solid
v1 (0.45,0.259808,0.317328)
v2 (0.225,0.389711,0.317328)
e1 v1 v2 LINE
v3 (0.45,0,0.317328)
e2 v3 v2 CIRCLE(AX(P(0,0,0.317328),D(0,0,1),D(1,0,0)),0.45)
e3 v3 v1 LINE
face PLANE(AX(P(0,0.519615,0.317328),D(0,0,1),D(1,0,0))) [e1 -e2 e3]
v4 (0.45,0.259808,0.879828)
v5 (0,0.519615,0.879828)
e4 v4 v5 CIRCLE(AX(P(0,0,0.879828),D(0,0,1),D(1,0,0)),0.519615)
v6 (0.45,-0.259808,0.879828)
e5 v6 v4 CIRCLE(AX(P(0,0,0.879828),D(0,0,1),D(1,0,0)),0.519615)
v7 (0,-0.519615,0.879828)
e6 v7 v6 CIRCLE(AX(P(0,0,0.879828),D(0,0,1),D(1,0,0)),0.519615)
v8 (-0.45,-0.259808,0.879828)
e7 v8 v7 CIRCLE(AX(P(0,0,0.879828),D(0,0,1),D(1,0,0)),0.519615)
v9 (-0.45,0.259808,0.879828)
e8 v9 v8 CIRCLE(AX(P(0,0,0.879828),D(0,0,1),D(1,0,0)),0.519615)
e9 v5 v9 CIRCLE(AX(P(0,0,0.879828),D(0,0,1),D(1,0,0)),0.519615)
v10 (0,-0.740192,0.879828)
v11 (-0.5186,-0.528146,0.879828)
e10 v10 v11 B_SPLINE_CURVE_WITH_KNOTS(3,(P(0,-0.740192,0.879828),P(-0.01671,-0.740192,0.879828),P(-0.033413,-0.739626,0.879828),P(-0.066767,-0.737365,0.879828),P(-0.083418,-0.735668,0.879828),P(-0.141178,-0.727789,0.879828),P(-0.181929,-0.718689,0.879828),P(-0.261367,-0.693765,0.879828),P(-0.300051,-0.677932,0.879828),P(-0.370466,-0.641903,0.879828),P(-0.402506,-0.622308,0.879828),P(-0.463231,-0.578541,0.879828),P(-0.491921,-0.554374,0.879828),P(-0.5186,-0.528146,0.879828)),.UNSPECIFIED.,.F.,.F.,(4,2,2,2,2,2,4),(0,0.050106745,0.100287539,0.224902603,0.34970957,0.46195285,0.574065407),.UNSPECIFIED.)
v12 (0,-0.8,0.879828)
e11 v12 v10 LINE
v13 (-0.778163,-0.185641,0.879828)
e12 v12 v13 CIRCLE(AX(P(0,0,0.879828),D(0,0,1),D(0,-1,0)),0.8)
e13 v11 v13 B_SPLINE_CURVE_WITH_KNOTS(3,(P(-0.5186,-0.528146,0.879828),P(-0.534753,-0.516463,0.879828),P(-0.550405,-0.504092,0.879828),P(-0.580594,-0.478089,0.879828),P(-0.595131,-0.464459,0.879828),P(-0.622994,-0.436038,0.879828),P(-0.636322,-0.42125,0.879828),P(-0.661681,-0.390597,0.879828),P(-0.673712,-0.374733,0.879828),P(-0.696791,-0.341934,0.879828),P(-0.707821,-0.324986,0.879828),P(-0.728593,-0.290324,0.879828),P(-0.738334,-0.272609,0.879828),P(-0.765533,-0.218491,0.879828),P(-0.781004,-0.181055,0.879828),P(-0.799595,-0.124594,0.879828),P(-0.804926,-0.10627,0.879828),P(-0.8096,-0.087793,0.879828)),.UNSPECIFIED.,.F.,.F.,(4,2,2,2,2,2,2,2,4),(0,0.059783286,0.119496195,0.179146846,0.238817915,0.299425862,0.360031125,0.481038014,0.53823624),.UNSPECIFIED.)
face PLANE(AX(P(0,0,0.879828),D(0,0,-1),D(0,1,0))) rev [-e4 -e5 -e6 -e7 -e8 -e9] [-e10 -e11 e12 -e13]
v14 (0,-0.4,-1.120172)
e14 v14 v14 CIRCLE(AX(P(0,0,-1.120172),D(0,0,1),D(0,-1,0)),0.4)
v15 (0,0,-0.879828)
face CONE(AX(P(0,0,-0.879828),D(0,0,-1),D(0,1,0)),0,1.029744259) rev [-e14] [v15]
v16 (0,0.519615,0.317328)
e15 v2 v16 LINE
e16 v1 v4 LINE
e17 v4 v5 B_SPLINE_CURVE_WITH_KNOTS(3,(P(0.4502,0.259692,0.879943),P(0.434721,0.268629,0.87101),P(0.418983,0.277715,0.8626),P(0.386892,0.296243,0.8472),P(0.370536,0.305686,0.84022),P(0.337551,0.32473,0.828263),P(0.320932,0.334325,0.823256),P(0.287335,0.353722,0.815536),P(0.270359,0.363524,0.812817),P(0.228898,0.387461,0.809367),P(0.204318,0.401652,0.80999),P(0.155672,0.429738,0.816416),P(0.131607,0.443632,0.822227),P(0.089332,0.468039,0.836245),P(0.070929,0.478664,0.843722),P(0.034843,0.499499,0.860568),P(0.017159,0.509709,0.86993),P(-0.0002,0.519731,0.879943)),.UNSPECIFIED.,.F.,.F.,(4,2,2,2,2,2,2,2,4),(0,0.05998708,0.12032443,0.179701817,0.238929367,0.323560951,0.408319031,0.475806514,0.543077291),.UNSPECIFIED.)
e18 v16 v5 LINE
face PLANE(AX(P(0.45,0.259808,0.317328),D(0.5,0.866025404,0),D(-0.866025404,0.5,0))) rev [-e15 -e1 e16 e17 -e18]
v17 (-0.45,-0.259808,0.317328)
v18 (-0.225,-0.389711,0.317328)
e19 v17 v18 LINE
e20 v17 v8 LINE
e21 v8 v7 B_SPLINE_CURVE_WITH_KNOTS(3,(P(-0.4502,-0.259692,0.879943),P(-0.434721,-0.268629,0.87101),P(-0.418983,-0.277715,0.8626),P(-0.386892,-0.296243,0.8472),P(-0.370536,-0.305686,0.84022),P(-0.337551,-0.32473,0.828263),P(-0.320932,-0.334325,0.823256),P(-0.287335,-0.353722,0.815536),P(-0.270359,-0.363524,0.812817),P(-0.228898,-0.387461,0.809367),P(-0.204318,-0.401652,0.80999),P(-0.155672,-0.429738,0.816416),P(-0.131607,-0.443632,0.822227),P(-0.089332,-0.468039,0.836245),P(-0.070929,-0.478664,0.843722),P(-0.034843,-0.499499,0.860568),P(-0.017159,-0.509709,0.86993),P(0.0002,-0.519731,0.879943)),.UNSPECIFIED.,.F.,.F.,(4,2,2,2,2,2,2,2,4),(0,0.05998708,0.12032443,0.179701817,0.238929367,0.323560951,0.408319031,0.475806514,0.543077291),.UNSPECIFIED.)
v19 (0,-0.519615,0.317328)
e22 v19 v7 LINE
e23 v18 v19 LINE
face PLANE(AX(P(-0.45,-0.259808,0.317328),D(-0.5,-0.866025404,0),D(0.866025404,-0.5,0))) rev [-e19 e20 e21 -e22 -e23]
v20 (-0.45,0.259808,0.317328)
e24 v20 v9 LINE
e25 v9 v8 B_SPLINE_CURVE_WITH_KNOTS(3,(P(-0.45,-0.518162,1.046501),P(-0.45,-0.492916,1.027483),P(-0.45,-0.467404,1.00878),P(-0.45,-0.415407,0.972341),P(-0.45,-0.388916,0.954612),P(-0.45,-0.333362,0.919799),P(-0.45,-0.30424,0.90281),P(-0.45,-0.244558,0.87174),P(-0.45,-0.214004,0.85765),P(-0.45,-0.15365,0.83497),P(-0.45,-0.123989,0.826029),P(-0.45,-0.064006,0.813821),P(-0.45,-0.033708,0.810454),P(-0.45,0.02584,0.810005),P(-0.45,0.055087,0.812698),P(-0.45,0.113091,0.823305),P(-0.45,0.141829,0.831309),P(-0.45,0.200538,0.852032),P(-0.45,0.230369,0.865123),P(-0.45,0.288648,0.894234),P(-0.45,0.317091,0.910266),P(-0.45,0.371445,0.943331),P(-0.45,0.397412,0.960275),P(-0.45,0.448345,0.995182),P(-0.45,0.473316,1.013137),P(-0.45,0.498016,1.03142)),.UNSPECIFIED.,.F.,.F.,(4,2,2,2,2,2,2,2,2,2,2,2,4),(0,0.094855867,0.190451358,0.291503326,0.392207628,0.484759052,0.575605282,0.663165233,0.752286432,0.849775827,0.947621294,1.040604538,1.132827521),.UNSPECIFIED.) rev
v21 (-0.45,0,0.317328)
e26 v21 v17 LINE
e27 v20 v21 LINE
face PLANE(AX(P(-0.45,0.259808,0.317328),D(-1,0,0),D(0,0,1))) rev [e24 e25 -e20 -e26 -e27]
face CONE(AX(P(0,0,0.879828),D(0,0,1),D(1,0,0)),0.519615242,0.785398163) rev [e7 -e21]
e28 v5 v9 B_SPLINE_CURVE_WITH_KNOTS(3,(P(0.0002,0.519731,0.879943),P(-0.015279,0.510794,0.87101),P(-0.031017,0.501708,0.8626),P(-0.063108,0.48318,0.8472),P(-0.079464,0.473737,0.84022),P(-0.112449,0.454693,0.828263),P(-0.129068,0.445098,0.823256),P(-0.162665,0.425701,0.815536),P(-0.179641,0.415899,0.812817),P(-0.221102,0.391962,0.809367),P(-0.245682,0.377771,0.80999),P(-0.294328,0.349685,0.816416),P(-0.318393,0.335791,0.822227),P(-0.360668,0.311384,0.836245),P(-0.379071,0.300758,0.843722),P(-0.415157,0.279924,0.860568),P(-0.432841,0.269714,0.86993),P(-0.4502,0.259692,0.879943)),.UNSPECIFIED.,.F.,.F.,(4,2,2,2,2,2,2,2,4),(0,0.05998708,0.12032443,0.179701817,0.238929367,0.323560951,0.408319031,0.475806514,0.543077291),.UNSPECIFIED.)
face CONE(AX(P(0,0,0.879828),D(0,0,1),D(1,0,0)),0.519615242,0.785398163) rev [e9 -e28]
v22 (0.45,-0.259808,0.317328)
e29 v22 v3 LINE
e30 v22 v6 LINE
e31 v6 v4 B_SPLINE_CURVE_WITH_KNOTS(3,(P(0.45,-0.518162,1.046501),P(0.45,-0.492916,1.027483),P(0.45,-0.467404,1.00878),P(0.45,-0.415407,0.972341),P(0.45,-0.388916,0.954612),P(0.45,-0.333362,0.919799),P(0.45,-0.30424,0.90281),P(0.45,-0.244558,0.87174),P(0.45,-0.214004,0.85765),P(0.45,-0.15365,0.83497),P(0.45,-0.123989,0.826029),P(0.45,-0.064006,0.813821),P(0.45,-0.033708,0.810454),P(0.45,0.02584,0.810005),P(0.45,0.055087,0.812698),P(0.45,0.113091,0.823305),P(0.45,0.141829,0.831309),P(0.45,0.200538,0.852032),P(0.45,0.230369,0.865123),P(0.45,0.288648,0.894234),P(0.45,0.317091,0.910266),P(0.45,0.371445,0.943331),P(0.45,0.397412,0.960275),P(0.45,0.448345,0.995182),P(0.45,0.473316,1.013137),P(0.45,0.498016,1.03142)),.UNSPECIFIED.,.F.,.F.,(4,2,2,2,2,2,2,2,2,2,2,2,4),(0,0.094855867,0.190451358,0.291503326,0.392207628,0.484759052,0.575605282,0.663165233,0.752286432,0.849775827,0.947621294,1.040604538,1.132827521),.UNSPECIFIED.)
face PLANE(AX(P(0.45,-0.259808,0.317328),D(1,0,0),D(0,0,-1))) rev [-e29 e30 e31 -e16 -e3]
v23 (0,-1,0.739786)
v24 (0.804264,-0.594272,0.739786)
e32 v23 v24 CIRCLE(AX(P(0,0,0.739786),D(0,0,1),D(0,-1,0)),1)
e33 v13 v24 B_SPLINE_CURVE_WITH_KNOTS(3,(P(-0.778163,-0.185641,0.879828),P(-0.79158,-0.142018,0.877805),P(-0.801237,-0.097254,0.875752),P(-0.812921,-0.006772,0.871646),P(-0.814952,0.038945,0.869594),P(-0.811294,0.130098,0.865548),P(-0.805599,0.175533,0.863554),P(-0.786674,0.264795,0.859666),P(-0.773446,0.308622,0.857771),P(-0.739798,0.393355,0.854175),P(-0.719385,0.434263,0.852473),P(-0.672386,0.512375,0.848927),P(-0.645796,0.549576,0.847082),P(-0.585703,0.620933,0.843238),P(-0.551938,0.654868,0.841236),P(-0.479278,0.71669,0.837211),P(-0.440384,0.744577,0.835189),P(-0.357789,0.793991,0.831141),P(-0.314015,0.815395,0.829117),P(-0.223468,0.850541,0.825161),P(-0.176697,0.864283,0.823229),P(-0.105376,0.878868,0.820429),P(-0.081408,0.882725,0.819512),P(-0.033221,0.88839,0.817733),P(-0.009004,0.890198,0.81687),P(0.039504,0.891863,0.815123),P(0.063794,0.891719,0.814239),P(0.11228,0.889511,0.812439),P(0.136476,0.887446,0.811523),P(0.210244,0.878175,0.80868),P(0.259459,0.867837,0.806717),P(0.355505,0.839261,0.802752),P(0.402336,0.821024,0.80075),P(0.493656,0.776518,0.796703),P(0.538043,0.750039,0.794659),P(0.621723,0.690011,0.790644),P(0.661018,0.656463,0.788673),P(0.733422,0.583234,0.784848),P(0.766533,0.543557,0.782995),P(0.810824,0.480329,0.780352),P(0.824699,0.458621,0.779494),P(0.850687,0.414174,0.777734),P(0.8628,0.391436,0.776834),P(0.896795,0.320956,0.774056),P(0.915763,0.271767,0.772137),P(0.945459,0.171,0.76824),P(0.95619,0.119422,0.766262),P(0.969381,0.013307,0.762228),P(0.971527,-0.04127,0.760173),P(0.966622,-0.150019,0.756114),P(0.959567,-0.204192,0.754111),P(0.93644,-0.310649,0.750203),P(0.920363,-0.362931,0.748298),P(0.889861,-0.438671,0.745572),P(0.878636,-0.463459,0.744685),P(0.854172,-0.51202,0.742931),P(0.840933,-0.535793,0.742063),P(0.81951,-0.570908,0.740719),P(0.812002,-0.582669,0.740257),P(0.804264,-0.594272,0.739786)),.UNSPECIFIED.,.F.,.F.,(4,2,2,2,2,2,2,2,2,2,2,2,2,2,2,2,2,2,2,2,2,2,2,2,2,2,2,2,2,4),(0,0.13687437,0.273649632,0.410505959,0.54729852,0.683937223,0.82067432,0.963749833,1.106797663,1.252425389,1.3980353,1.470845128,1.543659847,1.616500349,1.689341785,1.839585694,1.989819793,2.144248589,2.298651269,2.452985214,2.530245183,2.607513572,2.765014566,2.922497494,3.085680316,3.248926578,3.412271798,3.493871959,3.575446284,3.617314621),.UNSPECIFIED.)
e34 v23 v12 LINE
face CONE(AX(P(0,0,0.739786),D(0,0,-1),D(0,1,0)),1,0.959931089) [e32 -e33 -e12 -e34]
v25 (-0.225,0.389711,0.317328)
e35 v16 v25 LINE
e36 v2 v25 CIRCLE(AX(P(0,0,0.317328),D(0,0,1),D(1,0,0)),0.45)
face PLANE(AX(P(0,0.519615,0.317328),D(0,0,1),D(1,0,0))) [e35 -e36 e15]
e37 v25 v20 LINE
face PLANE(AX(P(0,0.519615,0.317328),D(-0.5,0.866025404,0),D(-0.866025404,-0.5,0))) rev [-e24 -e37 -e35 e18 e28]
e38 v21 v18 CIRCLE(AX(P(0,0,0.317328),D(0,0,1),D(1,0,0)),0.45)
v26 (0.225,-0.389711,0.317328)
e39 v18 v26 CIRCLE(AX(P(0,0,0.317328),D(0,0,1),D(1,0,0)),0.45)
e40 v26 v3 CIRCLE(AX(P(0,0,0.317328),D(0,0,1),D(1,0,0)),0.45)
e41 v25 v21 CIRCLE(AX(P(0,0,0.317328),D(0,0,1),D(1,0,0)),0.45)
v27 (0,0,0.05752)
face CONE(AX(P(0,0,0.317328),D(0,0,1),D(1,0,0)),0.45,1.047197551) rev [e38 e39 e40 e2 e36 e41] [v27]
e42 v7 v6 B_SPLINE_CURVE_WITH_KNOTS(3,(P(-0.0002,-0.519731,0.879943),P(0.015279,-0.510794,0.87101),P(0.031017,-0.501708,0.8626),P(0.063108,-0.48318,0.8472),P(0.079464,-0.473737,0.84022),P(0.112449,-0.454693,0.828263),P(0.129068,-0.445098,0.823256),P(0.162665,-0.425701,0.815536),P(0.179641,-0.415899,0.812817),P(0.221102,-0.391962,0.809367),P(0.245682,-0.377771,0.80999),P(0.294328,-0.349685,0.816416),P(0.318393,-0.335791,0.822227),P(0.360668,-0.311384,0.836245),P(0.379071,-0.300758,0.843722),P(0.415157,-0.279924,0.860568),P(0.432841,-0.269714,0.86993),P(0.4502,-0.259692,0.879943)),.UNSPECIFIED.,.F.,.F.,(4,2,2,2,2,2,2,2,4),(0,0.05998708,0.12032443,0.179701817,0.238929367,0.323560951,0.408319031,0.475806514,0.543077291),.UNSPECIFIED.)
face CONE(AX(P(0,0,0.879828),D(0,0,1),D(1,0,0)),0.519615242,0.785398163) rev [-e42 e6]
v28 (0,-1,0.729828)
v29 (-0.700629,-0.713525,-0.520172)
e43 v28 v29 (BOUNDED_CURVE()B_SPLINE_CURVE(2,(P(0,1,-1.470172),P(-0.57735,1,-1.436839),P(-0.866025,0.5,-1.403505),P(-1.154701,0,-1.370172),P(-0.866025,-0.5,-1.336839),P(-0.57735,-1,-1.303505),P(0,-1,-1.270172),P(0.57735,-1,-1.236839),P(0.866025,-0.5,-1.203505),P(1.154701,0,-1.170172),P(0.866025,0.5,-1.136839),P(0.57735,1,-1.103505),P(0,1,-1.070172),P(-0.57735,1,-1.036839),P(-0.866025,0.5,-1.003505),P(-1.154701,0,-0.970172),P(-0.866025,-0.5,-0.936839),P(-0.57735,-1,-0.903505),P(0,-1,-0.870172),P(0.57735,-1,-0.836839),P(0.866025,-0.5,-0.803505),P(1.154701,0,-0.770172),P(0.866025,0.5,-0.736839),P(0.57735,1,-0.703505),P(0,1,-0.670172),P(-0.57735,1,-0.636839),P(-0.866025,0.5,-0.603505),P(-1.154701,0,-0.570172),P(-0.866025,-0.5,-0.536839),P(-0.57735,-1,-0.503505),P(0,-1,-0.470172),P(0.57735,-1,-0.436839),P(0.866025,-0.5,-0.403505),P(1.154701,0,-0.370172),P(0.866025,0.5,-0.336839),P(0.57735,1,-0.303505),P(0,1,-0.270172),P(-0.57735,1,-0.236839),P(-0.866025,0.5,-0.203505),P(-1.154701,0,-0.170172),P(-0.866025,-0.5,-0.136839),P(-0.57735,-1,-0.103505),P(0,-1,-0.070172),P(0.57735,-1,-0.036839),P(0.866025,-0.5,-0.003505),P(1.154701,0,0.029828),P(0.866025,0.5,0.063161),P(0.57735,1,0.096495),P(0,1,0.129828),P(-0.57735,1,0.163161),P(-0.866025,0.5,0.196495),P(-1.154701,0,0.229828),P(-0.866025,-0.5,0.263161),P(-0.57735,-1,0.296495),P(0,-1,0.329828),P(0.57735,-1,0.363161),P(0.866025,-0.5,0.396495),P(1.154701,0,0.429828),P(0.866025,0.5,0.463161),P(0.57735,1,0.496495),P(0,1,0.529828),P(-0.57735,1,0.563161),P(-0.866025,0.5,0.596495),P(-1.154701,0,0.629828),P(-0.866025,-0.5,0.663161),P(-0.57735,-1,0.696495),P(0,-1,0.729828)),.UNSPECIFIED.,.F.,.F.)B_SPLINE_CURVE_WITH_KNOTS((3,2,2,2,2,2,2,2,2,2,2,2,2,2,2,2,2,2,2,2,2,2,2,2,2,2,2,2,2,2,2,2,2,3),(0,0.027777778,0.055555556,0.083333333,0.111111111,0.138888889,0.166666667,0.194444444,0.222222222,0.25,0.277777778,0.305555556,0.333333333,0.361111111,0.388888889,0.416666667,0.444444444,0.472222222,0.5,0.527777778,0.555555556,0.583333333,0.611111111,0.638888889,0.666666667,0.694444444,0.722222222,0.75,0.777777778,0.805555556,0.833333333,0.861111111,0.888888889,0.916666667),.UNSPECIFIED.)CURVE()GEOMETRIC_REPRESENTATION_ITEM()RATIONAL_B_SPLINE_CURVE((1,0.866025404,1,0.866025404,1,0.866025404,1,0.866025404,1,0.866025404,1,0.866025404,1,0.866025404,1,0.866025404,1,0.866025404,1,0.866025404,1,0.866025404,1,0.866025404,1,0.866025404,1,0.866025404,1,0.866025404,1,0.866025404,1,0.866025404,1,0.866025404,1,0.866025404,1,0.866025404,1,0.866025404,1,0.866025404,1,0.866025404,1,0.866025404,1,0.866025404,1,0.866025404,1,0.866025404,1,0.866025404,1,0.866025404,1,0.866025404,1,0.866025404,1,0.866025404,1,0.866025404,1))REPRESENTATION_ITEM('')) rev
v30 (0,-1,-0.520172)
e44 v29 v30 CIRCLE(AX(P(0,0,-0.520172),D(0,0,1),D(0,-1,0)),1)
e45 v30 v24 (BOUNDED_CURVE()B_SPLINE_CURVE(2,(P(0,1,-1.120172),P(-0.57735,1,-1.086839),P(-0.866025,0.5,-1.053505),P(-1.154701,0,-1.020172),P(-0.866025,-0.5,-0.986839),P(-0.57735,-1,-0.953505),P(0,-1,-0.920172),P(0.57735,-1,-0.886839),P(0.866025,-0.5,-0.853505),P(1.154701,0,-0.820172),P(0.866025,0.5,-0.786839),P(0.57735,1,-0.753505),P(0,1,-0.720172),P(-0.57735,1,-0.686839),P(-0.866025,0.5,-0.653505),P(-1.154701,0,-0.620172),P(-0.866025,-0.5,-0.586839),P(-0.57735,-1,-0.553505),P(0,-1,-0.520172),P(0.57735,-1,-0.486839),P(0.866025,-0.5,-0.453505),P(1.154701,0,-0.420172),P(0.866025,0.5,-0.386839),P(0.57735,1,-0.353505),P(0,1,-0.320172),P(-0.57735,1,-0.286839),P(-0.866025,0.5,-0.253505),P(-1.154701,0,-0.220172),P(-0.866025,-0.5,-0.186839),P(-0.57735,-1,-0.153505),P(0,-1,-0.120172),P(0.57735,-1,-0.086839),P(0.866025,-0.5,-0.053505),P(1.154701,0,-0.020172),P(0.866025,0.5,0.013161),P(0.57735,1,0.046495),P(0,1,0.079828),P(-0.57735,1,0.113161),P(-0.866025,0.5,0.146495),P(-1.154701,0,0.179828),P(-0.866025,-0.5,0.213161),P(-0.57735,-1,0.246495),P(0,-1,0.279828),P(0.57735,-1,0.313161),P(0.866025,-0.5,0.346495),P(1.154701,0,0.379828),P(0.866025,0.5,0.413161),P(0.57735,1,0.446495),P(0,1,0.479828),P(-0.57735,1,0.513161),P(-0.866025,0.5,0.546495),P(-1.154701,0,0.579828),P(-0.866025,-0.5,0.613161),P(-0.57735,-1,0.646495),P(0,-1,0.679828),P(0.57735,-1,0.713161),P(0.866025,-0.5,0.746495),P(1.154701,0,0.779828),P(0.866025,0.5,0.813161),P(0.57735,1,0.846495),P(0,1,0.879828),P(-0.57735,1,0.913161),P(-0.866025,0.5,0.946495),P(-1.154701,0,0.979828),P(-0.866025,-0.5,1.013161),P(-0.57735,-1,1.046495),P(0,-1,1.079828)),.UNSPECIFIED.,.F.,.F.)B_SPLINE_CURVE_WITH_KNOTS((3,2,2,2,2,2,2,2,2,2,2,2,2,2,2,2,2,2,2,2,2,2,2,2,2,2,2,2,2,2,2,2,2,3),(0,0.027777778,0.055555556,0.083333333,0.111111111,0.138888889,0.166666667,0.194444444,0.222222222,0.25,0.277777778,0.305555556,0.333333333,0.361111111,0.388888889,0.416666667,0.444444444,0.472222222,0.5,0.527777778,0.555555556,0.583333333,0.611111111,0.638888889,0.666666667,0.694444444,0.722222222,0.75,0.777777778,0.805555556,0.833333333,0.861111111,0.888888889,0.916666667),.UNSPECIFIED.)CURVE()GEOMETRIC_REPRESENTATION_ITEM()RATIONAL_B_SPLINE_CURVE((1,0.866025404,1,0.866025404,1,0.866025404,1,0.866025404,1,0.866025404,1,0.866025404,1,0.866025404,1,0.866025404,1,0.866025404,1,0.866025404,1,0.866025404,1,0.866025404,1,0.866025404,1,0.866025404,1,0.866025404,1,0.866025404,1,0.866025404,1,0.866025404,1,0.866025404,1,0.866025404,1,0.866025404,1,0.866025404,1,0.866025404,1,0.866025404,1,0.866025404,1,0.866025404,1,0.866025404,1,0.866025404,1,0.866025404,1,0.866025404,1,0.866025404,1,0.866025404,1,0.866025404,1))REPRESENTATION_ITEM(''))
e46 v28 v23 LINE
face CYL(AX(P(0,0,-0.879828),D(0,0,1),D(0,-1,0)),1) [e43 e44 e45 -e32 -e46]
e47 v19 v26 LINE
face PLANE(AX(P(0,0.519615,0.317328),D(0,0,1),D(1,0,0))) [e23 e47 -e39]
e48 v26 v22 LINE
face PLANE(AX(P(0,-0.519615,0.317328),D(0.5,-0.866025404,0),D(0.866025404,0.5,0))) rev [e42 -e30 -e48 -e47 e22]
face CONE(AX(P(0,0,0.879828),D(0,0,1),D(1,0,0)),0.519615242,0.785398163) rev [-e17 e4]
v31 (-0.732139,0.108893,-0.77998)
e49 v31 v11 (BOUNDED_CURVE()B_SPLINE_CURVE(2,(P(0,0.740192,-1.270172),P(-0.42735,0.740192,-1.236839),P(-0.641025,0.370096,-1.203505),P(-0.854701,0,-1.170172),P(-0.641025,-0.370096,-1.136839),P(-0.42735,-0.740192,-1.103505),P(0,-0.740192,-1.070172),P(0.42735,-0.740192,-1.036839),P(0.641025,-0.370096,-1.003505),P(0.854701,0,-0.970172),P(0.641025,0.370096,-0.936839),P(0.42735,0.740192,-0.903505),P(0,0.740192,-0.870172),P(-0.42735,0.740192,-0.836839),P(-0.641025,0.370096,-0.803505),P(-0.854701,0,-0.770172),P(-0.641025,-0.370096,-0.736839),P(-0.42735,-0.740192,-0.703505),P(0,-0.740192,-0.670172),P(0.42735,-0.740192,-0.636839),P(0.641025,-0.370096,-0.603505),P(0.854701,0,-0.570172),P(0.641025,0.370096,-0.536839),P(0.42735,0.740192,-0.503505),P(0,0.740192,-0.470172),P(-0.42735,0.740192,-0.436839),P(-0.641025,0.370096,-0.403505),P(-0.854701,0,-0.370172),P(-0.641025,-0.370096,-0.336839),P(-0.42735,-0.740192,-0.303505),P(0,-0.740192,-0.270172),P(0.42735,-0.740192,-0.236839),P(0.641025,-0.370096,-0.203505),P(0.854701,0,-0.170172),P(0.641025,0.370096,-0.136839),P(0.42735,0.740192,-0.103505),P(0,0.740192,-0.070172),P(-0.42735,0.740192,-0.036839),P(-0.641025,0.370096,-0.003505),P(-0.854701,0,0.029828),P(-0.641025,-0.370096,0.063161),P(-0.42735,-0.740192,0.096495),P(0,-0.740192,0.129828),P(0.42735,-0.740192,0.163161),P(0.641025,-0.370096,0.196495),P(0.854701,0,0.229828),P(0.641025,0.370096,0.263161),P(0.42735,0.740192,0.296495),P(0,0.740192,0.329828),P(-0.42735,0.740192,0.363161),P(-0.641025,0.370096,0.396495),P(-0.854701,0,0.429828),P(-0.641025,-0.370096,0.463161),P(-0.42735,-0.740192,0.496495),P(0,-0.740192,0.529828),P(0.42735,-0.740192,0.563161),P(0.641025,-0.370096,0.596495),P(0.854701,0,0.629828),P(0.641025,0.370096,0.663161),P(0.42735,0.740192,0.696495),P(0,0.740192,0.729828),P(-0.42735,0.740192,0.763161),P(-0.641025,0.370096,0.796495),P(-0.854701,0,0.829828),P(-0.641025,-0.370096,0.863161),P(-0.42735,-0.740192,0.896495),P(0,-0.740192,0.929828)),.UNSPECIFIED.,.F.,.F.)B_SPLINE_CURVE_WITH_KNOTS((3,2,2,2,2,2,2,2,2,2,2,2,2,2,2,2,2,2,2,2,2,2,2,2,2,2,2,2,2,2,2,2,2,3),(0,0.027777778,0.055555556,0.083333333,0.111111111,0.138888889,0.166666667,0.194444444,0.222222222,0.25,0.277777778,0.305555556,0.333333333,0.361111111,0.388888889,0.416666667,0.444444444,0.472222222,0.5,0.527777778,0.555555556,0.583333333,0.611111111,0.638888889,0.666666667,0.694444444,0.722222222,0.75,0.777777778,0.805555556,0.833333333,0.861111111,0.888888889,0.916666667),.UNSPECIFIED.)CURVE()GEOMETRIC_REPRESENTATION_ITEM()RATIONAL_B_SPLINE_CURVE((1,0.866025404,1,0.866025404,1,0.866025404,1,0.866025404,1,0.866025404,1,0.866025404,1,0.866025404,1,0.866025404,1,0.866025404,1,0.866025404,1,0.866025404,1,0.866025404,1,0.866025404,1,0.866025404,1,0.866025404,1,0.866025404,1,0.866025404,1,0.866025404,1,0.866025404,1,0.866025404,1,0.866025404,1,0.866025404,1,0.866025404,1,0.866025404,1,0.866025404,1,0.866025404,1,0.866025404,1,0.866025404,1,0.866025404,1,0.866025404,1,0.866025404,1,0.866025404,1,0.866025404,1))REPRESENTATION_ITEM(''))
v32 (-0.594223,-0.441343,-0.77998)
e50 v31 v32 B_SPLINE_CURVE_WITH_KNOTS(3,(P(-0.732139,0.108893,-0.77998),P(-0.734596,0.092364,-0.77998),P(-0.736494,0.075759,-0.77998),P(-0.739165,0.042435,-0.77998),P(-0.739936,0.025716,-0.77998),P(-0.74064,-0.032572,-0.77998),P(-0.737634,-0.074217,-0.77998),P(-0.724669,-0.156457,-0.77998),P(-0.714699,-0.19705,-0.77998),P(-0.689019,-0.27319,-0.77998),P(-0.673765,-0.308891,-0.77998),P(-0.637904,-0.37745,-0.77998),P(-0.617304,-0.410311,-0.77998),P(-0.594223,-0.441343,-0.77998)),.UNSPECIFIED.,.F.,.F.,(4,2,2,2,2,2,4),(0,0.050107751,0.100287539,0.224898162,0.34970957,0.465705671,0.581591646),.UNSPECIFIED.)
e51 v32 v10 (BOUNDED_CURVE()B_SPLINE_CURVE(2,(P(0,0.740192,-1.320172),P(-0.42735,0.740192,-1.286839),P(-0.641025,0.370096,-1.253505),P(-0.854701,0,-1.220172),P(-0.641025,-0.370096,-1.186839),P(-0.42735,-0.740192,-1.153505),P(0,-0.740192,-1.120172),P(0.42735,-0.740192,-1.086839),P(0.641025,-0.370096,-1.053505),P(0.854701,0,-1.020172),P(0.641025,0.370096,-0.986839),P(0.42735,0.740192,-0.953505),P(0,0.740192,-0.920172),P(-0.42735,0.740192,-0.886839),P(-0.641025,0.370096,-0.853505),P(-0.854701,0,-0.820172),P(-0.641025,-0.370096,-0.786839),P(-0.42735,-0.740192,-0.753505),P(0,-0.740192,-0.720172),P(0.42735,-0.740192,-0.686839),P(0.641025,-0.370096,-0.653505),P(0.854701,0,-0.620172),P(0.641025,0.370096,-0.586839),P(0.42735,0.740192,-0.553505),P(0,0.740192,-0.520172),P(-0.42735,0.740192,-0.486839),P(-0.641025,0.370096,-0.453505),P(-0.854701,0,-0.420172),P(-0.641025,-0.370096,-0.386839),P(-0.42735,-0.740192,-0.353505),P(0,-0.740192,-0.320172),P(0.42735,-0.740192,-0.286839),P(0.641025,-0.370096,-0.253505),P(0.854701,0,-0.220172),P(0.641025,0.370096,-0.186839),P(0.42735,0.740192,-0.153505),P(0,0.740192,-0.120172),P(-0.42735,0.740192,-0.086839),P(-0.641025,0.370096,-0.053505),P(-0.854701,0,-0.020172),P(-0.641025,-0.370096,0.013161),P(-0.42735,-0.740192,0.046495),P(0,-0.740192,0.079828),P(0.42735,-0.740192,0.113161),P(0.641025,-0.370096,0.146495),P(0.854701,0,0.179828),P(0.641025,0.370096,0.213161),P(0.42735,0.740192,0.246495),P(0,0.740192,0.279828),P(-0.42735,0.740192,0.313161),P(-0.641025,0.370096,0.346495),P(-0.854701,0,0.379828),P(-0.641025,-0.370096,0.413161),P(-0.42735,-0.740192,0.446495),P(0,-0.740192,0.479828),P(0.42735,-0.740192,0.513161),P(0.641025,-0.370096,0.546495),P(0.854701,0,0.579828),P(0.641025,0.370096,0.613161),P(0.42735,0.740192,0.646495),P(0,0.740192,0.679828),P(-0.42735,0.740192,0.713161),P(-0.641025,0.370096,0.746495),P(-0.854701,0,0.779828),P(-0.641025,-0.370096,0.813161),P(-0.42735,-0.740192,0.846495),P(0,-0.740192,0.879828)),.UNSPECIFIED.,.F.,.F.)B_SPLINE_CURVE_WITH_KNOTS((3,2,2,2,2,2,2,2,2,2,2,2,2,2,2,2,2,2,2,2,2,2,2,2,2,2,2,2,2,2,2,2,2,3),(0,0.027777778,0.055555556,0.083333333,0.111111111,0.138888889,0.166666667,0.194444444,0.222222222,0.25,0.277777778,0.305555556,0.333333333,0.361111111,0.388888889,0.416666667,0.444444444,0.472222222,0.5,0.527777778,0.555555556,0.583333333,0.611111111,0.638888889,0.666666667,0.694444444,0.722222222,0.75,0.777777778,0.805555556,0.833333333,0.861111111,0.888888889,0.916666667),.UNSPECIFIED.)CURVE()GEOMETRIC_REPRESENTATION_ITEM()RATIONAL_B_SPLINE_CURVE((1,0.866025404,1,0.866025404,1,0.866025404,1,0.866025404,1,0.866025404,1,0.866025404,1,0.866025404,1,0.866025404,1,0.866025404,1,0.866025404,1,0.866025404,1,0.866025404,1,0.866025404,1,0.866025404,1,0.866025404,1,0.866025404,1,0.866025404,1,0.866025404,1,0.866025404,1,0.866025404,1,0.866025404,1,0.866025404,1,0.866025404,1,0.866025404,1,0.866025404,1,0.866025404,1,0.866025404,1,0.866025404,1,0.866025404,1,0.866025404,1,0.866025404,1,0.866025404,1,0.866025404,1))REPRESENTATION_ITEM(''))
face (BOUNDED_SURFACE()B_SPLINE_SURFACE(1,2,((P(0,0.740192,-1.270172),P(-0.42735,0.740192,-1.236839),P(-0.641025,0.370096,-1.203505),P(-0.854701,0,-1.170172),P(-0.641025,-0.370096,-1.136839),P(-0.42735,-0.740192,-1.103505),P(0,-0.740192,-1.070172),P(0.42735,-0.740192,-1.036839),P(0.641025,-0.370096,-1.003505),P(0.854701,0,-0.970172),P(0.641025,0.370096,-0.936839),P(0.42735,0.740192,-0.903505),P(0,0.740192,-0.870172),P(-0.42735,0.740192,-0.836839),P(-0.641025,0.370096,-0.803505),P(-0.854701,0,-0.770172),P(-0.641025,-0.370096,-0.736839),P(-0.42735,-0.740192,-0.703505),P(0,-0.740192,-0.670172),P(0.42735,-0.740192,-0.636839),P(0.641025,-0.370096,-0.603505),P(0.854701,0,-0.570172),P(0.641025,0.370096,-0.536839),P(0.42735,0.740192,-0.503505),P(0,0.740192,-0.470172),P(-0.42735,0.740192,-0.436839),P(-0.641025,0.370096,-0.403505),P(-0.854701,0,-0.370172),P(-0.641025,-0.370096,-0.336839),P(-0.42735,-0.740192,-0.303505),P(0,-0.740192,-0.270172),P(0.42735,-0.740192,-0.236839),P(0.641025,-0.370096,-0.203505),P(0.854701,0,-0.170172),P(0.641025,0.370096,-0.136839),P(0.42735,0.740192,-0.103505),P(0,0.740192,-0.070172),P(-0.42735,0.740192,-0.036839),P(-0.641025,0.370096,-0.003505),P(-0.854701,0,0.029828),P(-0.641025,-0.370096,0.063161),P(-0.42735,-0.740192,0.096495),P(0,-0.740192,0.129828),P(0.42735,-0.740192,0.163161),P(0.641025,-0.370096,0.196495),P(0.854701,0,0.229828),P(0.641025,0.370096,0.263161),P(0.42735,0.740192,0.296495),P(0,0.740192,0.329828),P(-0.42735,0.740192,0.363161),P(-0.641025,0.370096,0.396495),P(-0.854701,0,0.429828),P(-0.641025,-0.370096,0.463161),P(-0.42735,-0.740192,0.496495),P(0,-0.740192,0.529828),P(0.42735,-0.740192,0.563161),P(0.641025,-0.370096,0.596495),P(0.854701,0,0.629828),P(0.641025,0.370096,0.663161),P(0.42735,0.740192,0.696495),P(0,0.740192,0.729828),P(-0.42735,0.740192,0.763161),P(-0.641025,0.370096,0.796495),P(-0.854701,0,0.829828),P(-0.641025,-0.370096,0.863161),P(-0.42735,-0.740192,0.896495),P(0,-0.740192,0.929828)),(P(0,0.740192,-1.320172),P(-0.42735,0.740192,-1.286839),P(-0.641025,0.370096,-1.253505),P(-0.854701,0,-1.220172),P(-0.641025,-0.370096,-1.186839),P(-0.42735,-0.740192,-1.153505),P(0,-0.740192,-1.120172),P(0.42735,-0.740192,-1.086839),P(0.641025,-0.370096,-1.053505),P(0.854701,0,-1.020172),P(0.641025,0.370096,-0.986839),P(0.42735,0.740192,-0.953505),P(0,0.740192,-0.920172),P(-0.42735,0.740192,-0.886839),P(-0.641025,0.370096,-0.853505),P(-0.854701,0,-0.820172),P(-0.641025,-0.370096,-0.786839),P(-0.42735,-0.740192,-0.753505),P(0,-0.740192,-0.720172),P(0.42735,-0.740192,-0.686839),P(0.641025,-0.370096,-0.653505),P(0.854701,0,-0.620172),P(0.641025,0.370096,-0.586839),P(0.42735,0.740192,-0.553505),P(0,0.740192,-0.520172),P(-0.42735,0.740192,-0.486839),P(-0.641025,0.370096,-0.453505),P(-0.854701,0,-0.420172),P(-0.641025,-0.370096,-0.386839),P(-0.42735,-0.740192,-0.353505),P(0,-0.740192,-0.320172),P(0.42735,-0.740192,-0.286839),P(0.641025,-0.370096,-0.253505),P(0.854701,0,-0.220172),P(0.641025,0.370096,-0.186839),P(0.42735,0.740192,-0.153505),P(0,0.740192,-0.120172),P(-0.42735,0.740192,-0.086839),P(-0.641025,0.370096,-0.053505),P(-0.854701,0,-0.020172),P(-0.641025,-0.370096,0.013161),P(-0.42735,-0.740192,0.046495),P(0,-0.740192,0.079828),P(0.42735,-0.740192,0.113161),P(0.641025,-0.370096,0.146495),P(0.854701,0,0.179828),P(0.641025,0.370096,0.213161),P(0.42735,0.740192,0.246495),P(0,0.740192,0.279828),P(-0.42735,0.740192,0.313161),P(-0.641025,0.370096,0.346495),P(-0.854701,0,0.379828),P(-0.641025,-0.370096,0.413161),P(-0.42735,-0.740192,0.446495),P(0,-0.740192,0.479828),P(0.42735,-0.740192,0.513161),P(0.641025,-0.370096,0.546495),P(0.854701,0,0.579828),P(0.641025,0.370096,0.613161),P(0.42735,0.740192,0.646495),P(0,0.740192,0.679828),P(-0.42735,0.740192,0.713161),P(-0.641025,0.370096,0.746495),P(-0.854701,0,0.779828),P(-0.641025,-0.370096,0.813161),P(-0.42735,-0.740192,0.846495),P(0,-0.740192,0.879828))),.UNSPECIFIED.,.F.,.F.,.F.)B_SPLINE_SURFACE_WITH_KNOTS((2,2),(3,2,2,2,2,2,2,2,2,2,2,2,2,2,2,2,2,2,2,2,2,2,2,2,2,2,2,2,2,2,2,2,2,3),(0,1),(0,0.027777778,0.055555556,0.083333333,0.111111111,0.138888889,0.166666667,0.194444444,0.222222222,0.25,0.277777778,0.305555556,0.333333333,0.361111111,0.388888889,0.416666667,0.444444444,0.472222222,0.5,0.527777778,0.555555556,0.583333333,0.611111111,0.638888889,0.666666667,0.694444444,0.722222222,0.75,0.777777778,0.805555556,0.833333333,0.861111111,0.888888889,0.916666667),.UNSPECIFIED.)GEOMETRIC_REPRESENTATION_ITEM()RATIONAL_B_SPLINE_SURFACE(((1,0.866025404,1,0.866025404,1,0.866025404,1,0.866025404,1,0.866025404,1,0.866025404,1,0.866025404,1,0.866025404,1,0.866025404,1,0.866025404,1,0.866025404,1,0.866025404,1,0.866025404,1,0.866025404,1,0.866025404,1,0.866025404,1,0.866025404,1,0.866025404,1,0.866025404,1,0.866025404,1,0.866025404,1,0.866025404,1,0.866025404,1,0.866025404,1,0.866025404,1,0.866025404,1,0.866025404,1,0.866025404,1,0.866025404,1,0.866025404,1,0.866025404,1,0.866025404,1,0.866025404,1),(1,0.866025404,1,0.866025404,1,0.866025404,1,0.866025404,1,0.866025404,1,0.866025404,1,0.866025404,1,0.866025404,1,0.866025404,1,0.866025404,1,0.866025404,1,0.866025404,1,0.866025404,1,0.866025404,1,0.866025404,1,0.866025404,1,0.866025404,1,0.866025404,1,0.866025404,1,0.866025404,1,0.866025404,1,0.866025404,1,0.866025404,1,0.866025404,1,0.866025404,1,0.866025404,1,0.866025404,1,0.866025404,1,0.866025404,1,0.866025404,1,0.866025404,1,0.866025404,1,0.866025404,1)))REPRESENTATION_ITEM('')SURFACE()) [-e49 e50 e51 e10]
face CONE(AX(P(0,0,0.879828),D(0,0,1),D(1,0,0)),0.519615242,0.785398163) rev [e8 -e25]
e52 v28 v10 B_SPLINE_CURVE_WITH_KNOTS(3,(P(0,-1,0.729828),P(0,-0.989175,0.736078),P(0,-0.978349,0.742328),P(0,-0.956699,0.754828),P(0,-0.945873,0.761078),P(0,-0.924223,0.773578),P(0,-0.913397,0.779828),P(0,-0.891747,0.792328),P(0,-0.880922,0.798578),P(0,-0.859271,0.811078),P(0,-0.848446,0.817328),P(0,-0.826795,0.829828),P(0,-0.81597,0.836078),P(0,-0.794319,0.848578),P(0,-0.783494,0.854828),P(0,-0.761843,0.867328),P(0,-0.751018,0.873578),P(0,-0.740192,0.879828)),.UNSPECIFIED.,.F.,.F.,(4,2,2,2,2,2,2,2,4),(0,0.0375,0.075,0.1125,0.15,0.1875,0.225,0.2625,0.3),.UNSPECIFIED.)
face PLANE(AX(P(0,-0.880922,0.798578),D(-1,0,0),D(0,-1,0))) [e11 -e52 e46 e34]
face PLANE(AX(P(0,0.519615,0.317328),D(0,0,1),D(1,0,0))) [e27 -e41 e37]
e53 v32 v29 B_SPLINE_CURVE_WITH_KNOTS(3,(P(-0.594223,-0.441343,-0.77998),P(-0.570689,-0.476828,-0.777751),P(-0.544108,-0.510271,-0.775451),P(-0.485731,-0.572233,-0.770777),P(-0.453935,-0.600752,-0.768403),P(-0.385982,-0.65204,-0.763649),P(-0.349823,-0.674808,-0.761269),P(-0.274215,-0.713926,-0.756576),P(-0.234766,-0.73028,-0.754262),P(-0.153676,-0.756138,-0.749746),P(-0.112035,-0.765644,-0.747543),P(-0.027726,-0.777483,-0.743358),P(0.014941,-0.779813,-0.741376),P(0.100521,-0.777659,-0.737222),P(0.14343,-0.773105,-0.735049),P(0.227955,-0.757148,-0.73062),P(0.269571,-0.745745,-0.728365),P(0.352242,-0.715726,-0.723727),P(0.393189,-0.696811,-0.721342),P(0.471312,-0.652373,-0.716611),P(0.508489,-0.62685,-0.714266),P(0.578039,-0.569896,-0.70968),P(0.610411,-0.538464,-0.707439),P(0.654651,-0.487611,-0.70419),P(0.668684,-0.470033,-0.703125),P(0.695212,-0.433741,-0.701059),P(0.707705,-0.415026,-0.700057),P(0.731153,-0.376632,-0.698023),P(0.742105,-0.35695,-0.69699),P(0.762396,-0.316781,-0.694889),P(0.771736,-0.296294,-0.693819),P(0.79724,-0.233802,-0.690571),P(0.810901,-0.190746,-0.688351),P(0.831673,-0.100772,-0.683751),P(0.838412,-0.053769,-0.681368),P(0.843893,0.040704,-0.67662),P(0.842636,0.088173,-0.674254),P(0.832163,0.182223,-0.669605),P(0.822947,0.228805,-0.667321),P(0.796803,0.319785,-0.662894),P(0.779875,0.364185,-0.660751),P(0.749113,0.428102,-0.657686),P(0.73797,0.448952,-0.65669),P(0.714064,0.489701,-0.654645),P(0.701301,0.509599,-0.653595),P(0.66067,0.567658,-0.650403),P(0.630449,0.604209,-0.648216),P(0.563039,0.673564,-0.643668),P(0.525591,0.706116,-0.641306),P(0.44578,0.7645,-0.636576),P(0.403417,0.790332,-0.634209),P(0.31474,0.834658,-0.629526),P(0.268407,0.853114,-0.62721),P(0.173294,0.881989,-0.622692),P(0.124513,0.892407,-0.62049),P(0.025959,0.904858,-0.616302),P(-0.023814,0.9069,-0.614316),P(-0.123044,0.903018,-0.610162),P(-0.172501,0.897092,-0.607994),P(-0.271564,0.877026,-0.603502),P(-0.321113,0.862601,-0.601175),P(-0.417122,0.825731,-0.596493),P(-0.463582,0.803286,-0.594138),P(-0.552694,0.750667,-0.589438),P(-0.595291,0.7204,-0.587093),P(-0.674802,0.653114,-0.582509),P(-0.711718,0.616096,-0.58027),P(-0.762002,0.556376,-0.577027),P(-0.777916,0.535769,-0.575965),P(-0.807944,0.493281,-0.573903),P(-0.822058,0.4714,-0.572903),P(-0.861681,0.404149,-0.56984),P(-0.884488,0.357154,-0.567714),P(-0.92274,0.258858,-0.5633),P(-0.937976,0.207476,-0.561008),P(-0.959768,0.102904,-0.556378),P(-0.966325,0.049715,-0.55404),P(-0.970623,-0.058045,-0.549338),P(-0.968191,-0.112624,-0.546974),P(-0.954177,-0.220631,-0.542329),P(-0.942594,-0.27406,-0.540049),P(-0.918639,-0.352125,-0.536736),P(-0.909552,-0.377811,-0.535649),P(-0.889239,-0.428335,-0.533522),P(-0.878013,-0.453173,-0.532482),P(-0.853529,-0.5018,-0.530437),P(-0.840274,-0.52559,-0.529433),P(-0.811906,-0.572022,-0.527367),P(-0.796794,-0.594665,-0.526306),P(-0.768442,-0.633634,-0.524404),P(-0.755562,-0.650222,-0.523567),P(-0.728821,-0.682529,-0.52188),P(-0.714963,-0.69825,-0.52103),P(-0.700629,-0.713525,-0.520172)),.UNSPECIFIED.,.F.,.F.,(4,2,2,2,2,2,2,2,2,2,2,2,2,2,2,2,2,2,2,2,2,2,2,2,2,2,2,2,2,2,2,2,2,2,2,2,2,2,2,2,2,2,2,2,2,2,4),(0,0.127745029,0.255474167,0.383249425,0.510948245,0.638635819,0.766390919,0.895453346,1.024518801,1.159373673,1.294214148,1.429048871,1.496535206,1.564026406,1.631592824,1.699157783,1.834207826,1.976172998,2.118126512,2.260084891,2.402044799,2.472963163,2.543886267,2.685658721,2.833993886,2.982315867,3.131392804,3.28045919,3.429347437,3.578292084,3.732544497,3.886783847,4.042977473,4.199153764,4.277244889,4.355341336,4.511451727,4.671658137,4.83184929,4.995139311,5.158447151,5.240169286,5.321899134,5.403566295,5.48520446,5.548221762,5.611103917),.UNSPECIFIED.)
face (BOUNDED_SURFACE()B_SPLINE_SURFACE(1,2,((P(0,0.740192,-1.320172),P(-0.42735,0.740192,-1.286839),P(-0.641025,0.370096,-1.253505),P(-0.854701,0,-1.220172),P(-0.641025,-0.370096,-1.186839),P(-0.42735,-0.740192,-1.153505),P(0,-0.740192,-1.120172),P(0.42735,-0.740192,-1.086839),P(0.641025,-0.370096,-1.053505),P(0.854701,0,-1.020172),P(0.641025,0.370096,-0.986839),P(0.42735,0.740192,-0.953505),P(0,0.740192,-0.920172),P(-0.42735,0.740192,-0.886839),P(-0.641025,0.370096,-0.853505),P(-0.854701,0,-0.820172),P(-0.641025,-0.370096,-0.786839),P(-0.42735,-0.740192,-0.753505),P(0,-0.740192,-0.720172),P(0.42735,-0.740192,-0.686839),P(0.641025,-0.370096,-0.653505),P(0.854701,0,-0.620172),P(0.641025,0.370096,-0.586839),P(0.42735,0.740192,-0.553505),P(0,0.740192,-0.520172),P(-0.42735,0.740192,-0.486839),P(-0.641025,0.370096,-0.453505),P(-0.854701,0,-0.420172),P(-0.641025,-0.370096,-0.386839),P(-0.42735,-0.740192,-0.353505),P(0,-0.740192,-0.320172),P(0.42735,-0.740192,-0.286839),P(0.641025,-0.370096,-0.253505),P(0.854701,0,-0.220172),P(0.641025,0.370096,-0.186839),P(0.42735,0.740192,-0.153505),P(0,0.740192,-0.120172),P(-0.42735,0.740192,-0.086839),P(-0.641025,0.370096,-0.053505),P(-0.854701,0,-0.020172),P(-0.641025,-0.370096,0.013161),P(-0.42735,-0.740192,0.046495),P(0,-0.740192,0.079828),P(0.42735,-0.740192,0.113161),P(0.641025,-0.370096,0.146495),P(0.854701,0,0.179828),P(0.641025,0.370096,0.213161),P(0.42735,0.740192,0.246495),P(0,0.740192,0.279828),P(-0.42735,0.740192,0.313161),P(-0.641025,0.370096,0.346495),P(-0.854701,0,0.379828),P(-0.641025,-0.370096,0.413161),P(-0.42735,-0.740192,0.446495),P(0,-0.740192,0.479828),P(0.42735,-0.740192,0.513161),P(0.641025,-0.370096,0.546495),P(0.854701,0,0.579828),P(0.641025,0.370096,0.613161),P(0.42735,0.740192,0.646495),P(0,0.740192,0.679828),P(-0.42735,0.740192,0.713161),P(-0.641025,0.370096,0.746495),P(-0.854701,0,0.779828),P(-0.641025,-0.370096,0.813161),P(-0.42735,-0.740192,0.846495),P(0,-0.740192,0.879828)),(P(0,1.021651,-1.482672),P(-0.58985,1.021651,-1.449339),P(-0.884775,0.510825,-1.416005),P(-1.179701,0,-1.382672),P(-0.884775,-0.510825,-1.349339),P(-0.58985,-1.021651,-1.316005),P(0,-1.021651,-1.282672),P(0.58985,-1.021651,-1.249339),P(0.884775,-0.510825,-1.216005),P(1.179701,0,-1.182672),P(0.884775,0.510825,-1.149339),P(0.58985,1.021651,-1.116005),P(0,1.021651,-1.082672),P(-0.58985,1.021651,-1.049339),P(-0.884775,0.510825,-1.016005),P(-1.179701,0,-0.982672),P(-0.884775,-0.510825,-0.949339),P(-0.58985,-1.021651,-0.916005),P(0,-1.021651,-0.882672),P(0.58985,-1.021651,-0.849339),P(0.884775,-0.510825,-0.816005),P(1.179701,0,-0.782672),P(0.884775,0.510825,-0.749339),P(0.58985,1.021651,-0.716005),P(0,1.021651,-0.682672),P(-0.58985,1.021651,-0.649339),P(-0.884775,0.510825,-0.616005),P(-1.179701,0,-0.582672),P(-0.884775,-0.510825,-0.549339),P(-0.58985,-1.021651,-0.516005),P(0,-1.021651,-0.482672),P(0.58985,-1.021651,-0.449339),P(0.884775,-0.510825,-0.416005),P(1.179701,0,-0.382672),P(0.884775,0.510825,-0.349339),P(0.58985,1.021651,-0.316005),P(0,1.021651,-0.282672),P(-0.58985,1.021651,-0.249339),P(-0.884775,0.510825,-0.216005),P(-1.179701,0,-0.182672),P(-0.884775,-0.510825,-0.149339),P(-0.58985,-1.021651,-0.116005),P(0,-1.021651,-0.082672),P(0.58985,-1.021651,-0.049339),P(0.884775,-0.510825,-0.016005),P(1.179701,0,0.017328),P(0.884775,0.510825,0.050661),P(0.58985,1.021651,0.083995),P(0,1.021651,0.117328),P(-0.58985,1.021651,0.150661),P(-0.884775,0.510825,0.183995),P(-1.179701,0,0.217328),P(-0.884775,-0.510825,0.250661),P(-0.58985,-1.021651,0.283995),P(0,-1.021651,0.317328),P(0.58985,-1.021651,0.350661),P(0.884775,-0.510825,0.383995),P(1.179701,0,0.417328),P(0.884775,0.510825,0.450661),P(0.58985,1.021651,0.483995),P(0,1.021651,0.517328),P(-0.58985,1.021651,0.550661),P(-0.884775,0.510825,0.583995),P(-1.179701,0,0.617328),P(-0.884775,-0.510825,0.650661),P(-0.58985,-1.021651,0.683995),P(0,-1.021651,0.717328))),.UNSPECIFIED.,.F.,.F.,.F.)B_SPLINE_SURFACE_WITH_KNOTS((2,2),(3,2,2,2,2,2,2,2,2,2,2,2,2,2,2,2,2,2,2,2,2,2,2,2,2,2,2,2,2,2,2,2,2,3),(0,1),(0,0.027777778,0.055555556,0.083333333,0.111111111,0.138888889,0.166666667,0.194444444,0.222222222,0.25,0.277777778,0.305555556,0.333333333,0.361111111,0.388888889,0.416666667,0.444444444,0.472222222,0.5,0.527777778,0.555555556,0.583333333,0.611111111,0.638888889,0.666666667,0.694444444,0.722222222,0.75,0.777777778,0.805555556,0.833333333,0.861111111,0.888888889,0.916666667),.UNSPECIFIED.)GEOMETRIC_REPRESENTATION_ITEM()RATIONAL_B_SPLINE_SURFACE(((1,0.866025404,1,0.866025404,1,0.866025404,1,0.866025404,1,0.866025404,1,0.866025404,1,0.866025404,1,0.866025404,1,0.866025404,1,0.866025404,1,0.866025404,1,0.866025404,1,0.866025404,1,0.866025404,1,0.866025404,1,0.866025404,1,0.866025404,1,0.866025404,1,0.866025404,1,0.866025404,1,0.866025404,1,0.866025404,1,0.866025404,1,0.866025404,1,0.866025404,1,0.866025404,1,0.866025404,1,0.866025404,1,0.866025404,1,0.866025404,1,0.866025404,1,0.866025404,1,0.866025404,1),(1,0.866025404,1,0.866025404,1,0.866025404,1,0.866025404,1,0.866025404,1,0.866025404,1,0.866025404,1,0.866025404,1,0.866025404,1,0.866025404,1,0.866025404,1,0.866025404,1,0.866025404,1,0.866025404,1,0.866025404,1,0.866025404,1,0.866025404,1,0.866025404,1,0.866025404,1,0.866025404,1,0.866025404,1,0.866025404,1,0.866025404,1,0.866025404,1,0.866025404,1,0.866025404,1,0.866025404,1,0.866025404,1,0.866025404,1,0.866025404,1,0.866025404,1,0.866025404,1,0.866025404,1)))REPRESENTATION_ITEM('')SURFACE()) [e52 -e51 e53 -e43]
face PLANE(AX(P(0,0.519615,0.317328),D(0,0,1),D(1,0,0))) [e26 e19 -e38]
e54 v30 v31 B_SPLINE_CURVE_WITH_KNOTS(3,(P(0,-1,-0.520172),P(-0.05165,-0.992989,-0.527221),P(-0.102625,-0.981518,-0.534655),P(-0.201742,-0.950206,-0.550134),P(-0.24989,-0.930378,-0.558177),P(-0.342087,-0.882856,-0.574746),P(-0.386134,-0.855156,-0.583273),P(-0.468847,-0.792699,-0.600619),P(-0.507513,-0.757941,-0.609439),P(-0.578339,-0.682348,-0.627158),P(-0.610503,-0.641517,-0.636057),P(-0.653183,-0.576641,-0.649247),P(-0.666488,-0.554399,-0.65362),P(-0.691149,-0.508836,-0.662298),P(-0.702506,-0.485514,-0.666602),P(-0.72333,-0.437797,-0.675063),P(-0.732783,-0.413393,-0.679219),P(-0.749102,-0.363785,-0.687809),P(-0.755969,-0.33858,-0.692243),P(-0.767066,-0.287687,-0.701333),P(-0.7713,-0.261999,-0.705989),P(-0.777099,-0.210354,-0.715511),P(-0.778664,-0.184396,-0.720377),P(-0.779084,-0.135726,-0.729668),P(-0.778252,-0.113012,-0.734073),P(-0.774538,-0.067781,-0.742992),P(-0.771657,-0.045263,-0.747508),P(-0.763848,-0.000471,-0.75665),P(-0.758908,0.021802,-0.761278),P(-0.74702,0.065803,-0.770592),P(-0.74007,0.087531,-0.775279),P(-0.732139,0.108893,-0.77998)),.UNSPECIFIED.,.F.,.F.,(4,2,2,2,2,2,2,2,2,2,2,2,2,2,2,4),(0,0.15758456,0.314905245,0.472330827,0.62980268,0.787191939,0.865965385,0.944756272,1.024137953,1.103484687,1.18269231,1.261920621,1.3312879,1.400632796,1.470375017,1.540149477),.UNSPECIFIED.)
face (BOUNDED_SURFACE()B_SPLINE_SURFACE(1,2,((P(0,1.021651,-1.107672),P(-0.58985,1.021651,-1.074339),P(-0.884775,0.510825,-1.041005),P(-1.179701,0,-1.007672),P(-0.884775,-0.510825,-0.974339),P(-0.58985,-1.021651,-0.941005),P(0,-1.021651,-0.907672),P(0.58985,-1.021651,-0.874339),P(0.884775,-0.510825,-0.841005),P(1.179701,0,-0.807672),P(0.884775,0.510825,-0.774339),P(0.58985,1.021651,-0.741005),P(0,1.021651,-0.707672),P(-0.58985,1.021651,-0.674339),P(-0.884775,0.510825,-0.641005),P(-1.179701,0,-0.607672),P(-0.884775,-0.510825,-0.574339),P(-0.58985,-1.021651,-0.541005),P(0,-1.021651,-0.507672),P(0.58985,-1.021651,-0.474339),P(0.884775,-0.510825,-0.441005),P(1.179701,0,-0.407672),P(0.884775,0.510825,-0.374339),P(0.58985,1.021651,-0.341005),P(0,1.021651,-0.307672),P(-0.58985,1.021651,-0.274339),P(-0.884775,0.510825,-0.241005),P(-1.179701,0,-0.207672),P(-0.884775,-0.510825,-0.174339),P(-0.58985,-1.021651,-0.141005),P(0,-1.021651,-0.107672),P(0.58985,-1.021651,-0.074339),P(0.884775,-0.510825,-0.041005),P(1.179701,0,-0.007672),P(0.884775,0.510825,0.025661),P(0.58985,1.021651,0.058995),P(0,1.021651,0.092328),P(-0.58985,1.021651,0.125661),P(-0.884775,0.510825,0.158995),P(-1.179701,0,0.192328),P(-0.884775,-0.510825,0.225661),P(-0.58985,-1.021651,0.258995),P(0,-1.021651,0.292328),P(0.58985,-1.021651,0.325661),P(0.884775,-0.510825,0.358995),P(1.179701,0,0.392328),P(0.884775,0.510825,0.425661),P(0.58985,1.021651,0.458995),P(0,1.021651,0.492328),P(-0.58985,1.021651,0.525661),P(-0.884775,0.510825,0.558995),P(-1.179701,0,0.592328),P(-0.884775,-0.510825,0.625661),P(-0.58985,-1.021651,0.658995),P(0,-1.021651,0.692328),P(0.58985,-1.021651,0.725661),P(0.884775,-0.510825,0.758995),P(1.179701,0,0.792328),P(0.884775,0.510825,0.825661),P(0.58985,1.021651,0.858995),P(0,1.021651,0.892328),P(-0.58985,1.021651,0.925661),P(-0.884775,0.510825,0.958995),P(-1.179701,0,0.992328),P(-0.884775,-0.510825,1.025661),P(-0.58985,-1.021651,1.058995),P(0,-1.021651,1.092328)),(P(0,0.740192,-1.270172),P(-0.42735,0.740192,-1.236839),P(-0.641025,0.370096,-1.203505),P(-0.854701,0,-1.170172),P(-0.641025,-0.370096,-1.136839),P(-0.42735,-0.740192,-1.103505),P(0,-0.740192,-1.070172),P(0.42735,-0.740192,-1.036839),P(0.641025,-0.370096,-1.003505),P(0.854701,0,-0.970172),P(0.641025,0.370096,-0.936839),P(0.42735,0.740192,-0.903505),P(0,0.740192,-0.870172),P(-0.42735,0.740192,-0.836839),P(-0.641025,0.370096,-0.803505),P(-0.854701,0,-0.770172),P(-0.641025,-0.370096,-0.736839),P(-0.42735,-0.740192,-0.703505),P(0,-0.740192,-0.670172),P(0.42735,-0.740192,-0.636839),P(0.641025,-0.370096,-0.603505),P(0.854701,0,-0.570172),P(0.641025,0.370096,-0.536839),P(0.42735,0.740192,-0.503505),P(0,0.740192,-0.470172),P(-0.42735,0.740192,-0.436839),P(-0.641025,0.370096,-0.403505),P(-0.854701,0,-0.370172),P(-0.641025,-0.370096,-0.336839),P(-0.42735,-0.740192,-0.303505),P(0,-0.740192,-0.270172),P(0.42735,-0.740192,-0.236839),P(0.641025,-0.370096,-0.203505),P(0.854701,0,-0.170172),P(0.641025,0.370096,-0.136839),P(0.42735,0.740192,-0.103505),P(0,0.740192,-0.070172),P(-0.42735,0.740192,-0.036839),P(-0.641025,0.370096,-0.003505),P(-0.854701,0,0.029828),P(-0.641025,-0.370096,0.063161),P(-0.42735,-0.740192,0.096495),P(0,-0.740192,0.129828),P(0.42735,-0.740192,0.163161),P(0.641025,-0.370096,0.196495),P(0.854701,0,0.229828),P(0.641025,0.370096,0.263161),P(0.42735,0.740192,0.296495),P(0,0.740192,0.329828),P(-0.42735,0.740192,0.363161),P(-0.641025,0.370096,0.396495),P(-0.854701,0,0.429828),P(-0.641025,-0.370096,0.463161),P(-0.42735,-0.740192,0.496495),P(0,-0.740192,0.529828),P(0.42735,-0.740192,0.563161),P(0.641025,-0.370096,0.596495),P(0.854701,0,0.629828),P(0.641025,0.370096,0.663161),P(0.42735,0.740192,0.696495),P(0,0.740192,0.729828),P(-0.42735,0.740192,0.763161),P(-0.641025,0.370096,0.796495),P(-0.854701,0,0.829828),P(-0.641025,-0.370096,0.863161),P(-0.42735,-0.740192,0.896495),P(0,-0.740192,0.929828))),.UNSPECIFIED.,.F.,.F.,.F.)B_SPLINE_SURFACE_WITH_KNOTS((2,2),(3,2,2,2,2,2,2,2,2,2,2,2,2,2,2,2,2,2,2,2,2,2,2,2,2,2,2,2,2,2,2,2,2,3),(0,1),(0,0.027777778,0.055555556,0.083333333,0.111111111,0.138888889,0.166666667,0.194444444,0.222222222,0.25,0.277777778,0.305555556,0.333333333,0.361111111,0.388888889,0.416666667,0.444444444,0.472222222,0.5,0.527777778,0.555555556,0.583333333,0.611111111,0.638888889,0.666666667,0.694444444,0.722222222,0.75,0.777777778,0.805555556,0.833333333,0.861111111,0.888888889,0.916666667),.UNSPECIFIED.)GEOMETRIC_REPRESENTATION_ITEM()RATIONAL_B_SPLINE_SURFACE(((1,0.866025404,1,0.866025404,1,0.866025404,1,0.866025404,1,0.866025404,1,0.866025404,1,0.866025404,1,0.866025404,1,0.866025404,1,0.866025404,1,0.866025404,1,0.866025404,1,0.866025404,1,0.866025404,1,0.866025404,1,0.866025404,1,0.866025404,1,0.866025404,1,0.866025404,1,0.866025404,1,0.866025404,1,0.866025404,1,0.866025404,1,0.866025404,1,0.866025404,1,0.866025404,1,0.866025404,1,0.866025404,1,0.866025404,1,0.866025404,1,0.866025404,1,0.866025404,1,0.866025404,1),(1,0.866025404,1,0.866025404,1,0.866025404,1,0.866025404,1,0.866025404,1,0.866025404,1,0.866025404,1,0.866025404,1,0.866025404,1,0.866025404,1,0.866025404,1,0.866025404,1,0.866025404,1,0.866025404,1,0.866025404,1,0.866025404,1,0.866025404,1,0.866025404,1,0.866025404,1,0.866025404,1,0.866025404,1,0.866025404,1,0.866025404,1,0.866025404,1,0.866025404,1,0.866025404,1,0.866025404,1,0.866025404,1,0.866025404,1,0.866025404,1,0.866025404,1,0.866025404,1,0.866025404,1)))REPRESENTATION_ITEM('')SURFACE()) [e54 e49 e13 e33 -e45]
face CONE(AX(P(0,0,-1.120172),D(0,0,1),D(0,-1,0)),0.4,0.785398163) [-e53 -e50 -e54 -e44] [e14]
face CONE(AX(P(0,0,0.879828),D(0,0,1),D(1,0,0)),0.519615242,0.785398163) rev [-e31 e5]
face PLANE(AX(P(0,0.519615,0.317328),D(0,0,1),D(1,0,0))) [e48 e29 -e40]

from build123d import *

# Parameters (mm, degrees)
CUT_EXTRUDE1_DEPTH = 0.5625
CUT_SWEEP1_PITCH   = 0.4


with BuildPart() as part:
    # Sketch1 → Revolve1 (revolve)
    with BuildSketch(Plane(origin=(0, 0, 0), x_dir=(0, 0, -1), z_dir=(1, 0, 0)), mode=Mode.PRIVATE) as revolve1_sk:
        Polygon((-0.879827876, 0), (-0.879827876, 0.8), (-0.739786369, 1), (0.520172124, 1), (1.120172124, 0.4), (0.879827876, 0), align=None)
    revolve(revolve1_sk.sketch.rotate(Axis((0, 0, -0.879827876), (0, 0, -1)), 180), axis=Axis((0, 0, -0.879827876), (0, 0, -1)))

    # Sketch2 → Cut-Extrude1 (cut)
    with BuildSketch(Plane.XY.offset(0.879827876)):
        Polygon((0, 0.519615242), (-0.45, 0.259807621), (-0.45, -0.259807621), (0, -0.519615242), (0.45, -0.259807621), (0.45, 0.259807621), align=None)
    extrude(amount=-CUT_EXTRUDE1_DEPTH, mode=Mode.SUBTRACT)

    # Cut-Extrude2 cone 1 section (through the dimple's axis) → Cut-Extrude2 (revolve, cut)
    with BuildSketch(Plane(origin=(0, 0, 0.879827876), x_dir=(0, -1, 0), z_dir=(1, 0, 0))):
        Polygon((0, 0), (0.519615242, 0), (0, 0.519615242), align=None)
    revolve(axis=Axis((0, 0, 0.879827876), (0, 0, -1)), mode=Mode.SUBTRACT)

    # Cut-Extrude3 cone 1 section (through the dimple's axis) → Cut-Extrude3 (revolve, cut)
    with BuildSketch(Plane(origin=(0, 0, 0.317327876), x_dir=(0, -1, 0), z_dir=(1, 0, 0))):
        Polygon((0, 0), (0.45, 0), (0, 0.259807621), align=None)
    revolve(axis=Axis((0, 0, 0.317327876), (0, 0, -1)), mode=Mode.SUBTRACT)

    # Cut-Sweep1: the profile of Sketch6 screwed along a right-hand helix of 5.5 turns, 6 arcs to a turn; built about Z, then put on its axis
    cut_sweep1_z = Axis((0, 0, 0), (0, 0, 1))
    cut_sweep1_corners = [(0.740192379, 0, -0.15), (1.021650635, 0, 0.0125), (1.021650635, 0, -0.3625), (0.740192379, 0, -0.2)]
    with BuildLine(mode=Mode.PRIVATE) as cut_sweep1_profile:
        Line(cut_sweep1_corners[0], cut_sweep1_corners[1])
        Line(cut_sweep1_corners[1], cut_sweep1_corners[2])
        Line(cut_sweep1_corners[2], cut_sweep1_corners[3])
        Line(cut_sweep1_corners[3], cut_sweep1_corners[0])
    cut_sweep1_cap = Face(cut_sweep1_profile.wire())
    cut_sweep1_turn_angles = [0, 30, 60, 90, 120, 150, 180, 210, 240, 270, 300, 330, 360]
    cut_sweep1_turn_weights = [1, 0.8660254037844387, 1, 0.8660254037844387, 1, 0.8660254037844387, 1, 0.8660254037844387, 1, 0.8660254037844387, 1, 0.8660254037844387, 1]
    cut_sweep1_turn_rails = [Edge.make_bspline([Vector(p[0], p[1], 0).rotate(cut_sweep1_z, cut_sweep1_turn_angles[k]) / cut_sweep1_turn_weights[k] + Vector(0, 0, p[2] + CUT_SWEEP1_PITCH * cut_sweep1_turn_angles[k] / 360) for k in range(13)], [0, 0, 0, 1, 1, 2, 2, 3, 3, 4, 4, 5, 5, 6, 6, 6], 2, cut_sweep1_turn_weights) for p in cut_sweep1_corners]
    cut_sweep1_turn_sides = [Face.make_surface_from_curves(cut_sweep1_turn_rails[p[0]], cut_sweep1_turn_rails[p[1]]) for p in [(0, 1), (1, 2), (2, 3), (3, 0)]]
    cut_sweep1_last_angles = [1800, 1830, 1860, 1890, 1920, 1950, 1980]
    cut_sweep1_last_weights = [1, 0.8660254037844387, 1, 0.8660254037844387, 1, 0.8660254037844198, 1]
    cut_sweep1_last_rails = [Edge.make_bspline([Vector(p[0], p[1], 0).rotate(cut_sweep1_z, cut_sweep1_last_angles[k]) / cut_sweep1_last_weights[k] + Vector(0, 0, p[2] + CUT_SWEEP1_PITCH * cut_sweep1_last_angles[k] / 360) for k in range(7)], [0, 0, 0, 1, 1, 2, 2, 3, 3, 3], 2, cut_sweep1_last_weights) for p in cut_sweep1_corners]
    cut_sweep1_last_sides = [Face.make_surface_from_curves(cut_sweep1_last_rails[p[0]], cut_sweep1_last_rails[p[1]]) for p in [(0, 1), (1, 2), (2, 3), (3, 0)]]
    cut_sweep1 = Plane(origin=(0, 0, -1.120172124), x_dir=(0, 1, 0), z_dir=(0, 0, 1)) * Solid(Shell([*[p.moved(Location((0, 0, CUT_SWEEP1_PITCH * i))) for i in range(5) for p in cut_sweep1_turn_sides], *cut_sweep1_last_sides, cut_sweep1_cap, cut_sweep1_cap.rotate(cut_sweep1_z, 1980).moved(Location((0, 0, CUT_SWEEP1_PITCH * 1980 / 360)))]))
    add(cut_sweep1, mode=Mode.SUBTRACT)


solid = part.part
